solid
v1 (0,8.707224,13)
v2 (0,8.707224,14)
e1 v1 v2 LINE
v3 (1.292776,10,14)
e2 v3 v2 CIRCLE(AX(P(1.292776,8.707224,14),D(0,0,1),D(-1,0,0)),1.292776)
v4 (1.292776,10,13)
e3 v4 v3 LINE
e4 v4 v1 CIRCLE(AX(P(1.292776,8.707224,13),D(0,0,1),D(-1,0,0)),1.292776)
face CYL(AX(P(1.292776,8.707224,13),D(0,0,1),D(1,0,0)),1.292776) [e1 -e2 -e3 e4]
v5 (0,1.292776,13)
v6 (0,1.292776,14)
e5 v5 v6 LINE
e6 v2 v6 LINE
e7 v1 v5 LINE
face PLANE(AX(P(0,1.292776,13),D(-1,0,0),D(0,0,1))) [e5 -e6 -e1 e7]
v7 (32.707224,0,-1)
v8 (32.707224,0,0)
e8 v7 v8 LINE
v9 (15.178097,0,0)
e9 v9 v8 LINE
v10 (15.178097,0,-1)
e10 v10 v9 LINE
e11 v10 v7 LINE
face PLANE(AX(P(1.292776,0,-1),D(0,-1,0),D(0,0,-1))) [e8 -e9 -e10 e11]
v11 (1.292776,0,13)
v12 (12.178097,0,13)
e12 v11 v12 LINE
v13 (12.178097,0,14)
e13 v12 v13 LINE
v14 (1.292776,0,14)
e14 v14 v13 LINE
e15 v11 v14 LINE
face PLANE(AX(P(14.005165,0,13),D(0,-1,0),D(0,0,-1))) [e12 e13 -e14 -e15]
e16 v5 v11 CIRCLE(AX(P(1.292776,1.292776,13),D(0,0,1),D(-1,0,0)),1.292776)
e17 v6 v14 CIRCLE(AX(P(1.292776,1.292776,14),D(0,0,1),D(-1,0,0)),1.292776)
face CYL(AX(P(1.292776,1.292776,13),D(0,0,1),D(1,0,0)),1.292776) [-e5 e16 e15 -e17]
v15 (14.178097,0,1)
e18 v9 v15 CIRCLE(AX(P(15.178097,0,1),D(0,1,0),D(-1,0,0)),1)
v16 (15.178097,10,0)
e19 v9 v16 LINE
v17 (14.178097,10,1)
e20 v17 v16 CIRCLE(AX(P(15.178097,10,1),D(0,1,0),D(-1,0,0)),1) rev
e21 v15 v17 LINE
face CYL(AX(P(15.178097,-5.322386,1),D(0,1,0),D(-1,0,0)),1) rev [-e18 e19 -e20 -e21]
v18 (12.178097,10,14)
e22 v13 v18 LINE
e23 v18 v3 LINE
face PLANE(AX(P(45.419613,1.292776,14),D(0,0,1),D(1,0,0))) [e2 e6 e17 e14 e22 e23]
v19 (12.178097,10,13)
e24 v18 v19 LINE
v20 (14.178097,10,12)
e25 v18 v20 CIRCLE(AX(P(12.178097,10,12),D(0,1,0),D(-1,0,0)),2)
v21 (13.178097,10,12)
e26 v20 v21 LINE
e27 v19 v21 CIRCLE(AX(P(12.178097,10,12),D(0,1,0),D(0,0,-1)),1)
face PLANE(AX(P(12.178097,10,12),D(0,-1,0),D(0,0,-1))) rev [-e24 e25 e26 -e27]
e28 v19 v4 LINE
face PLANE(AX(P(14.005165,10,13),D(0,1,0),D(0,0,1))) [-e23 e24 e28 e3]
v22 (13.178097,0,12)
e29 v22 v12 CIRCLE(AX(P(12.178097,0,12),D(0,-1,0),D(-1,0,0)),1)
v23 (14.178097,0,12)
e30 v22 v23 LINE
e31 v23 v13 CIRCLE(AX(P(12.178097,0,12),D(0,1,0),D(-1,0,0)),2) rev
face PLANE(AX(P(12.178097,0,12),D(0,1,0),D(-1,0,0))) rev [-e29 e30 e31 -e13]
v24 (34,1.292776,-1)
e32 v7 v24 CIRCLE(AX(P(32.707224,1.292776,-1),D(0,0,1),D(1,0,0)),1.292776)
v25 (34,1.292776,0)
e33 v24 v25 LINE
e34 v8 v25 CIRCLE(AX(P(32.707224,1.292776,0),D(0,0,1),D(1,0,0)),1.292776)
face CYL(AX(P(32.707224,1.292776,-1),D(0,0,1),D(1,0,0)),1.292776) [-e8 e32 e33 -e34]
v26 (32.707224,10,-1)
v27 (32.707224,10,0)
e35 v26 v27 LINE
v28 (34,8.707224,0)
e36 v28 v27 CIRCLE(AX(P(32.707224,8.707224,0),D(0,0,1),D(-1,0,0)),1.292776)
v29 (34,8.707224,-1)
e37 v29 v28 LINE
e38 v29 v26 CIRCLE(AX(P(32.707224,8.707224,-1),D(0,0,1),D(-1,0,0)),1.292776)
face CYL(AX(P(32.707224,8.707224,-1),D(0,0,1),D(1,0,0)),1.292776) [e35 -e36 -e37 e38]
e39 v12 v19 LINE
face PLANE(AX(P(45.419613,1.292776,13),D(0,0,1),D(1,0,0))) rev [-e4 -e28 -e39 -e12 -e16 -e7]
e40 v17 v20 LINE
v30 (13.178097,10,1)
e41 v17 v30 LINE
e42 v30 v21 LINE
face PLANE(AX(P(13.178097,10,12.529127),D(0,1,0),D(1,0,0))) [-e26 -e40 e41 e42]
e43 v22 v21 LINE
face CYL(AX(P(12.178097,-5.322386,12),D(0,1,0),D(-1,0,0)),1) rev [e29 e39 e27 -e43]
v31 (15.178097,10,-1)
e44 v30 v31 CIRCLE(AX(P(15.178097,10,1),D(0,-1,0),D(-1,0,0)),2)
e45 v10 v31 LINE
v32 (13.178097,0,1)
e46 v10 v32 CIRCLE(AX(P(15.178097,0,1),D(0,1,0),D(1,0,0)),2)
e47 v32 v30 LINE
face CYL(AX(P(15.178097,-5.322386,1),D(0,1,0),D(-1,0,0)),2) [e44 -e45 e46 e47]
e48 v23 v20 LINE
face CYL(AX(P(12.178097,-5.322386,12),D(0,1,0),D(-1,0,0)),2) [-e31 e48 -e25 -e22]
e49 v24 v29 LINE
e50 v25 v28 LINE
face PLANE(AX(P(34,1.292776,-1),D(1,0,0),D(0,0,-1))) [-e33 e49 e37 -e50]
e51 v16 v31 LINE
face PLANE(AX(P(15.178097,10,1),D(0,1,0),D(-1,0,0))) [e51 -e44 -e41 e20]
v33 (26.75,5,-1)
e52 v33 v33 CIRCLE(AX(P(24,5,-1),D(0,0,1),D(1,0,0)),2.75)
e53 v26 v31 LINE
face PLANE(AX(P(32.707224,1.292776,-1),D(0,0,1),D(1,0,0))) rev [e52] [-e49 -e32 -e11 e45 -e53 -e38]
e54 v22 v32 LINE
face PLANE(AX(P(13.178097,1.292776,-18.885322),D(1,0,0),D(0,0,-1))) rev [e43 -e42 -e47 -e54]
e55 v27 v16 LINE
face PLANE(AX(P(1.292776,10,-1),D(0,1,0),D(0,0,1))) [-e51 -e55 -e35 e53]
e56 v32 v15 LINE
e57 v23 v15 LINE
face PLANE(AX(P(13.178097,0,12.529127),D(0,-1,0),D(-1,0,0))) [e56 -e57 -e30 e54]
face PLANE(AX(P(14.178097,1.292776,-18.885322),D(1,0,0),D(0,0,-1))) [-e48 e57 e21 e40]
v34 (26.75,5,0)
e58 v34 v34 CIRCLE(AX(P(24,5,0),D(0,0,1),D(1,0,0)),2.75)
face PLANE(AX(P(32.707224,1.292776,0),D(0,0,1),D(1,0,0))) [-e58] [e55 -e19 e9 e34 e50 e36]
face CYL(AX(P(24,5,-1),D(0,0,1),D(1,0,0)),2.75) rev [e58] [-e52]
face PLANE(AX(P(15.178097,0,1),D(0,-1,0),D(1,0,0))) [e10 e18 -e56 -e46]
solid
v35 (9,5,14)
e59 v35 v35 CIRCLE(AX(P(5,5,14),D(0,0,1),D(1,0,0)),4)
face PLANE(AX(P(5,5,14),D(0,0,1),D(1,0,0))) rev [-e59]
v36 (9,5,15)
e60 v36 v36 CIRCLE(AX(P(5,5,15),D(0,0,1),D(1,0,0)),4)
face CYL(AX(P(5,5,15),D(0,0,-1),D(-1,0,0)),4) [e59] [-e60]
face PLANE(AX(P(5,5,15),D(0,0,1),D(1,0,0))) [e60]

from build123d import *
from build123d.topology import SkipClean

# Parameters (mm, degrees)
SKETCH1_R           = 2.75
BASE_FLANGE1_DEPTH  = 1
JOG1_DEPTH          = 10
JOG1_START          = 1.292775665
JOG1_2_DEPTH        = 7.41444867
JOG1_START_2        = 12
JOG1_3_DEPTH        = 1.974011807
JOG1_4_OUTLINE_W    = 1
JOG1_4_OUTLINE_H    = 1.292775665
JOG1_4_DEPTH        = 12.152182036
JOG1_START_3        = 13
JOG1_5_DEPTH        = 1
JOG1_6_DEPTH        = 10
JOG1_7_DEPTH        = 10
SKETCH7_R           = 4
BOSS_EXTRUDE1_DEPTH = 1


with BuildPart() as part:
    # Base-Flange1: sheet metal written as solids
    # Sketch1 → Base-Flange1 (new body)
    with BuildSketch(Plane.XY):
        with BuildLine():
            Line((1.292775665, 0), (32.707224335, 0))
            ThreePointArc((32.707224335, 0), (33.621354774, 0.378645226), (34, 1.292775665))
            Line((34, 1.292775665), (34, 8.707224335))
            ThreePointArc((34, 8.707224335), (33.621354774, 9.621354774), (32.707224335, 10))
            Line((32.707224335, 10), (1.292775665, 10))
            ThreePointArc((1.292775665, 10), (0.378645226, 9.621354774), (0, 8.707224335))
            Line((0, 8.707224335), (0, 1.292775665))
            ThreePointArc((0, 1.292775665), (0.378645226, 0.378645226), (1.292775665, 0))
        make_face()
        with Locations((24, 5)):
            Circle(SKETCH1_R, mode=Mode.SUBTRACT)
    extrude(amount=-BASE_FLANGE1_DEPTH)

    # Jog1: read off the stored shape, not the designer's step
    # Jog1 outline → Jog1 (cut)
    with BuildSketch(Plane(origin=(0, 0, 0), x_dir=(1, 0, 0), z_dir=(0, 1, 0))):
        with BuildLine():
            Line((0, 0), (13.446046438, 0))
            ThreePointArc((13.446046438, 0), (14.178097245, 0.732050807), (15.178097245, 1))
            Line((15.178097245, 1), (0, 1))
            Line((0, 1), (0, 0))
        make_face()
    extrude(amount=JOG1_DEPTH, mode=Mode.SUBTRACT)

    # Jog1 2 outline → Jog1 2 (add)
    with BuildSketch(Plane(origin=(0, 0, 0), x_dir=(1, 0, 0), z_dir=(0, 1, 0)).offset(JOG1_START)):
        with BuildLine():
            Line((13.178097245, -1), (13.178097245, -12))
            ThreePointArc((13.178097245, -12), (12.885204026, -12.707106781), (12.178097245, -13))
            Line((12.178097245, -13), (0, -13))
            Line((0, -13), (0, -14))
            Line((0, -14), (12.178097245, -14))
            ThreePointArc((12.178097245, -14), (13.592310807, -13.414213562), (14.178097245, -12))
            Line((14.178097245, -12), (14.178097245, -1))
            ThreePointArc((14.178097245, -1), (14.470990464, -0.292893219), (15.178097245, 0))
            Line((15.178097245, 0), (13.446046438, 0))
            ThreePointArc((13.446046438, 0), (13.246245593, -0.48236191), (13.178097245, -1))
        make_face()
    extrude(amount=JOG1_2_DEPTH)

    # Jog1 3 outline → Jog1 3 (add)
    with BuildSketch(Plane.XY.offset(JOG1_START_2)):
        with BuildLine():
            Line((14.178097245, 0), (14.178097245, 1.292775665))
            Line((14.178097245, 1.292775665), (0, 1.292775665))
            ThreePointArc((0, 1.292775665), (0.378645226, 0.378645226), (1.292775665, 0))
            Line((1.292775665, 0), (14.178097245, 0))
        make_face()
        with BuildLine():
            Line((0, 8.707224335), (14.178097245, 8.707224335))
            Line((14.178097245, 8.707224335), (14.178097245, 10))
            Line((14.178097245, 10), (1.292775665, 10))
            ThreePointArc((1.292775665, 10), (0.378645226, 9.621354774), (0, 8.707224335))
        make_face()
    extrude(amount=JOG1_3_DEPTH)

    # Jog1 4 outline → Jog1 4 (add)
    with BuildSketch(Plane.XY):
        with Locations((13.678097245, 0.646387833)):
            Rectangle(JOG1_4_OUTLINE_W, JOG1_4_OUTLINE_H)
        with Locations((13.678097245, 9.353612167)):
            Rectangle(JOG1_4_OUTLINE_W, JOG1_4_OUTLINE_H)
    extrude(amount=JOG1_4_DEPTH)

    # Jog1 5 outline → Jog1 5 (add)
    with BuildSketch(Plane.XY.offset(JOG1_START_3)):
        with BuildLine():
            Line((1.292775665, 0), (13.178097245, 0))
            Line((13.178097245, 0), (13.178097245, 1.292775665))
            Line((13.178097245, 1.292775665), (0, 1.292775665))
            ThreePointArc((0, 1.292775665), (0.378645226, 0.378645226), (1.292775665, 0))
        make_face()
        with BuildLine():
            Line((0, 8.707224335), (13.178097245, 8.707224335))
            Line((13.178097245, 8.707224335), (13.178097245, 10))
            Line((13.178097245, 10), (1.292775665, 10))
            ThreePointArc((1.292775665, 10), (0.378645226, 9.621354774), (0, 8.707224335))
        make_face()
    extrude(amount=JOG1_5_DEPTH)

    # Jog1 6 outline → Jog1 6 (cut)
    with SkipClean():  # the faces are left unmerged after this step: merging them gives an invalid solid
        with BuildSketch(Plane(origin=(0, 0, 0), x_dir=(1, 0, 0), z_dir=(0, 1, 0))):
            with BuildLine():
                ThreePointArc((13.178097245, -1), (13.246245593, -0.48236191), (13.446046438, 0))
                ThreePointArc((13.446046438, 0), (13.763883685, 0.414213564), (14.178097249, 0.732050809))
                Line((14.178097249, 0.732050809), (14.178097253, 1))
                Line((14.178097253, 1), (-1, 1))
                Line((-1, 1), (-1, -13))
                Line((-1, -13), (12.178097245, -13))
                ThreePointArc((12.178097245, -13), (12.885204026, -12.707106781), (13.178097245, -12))
                Line((13.178097245, -12), (13.178097245, -1))
            make_face()
            with BuildLine():
                Line((13.178097245, -14), (13.178097245, -13.974011807))
                Line((13.178097245, -13.974011807), (14.178097245, -13.974011807))
                Line((14.178097245, -13.974011807), (14.178097245, -12))
                ThreePointArc((14.178097245, -12), (13.592310807, -13.414213562), (12.178097245, -14))
                Line((12.178097245, -14), (-1, -14.000000008))
                Line((-1, -14.000000008), (-1, -15))
                Line((-1, -15), (13.178097236, -15))
                Line((13.178097236, -15), (13.178097245, -14))
            make_face()
        extrude(amount=JOG1_6_DEPTH, mode=Mode.SUBTRACT)
    add(part.part.scale(1), mode=Mode.REPLACE)  # the faces are merged on a copy

    # Jog1 7 outline → Jog1 7 (add)
    with BuildSketch(Plane(origin=(0, 0, 0), x_dir=(1, 0, 0), z_dir=(0, 1, 0))):
        with BuildLine():
            ThreePointArc((15.178097245, 1), (14.660459157, 0.931851653), (14.178097249, 0.732050809))
            Line((14.178097249, 0.732050809), (14.178097252, 0))
            Line((14.178097252, 0), (14.178097245, -1))
            ThreePointArc((14.178097245, -1), (14.470990464, -0.292893219), (15.178097245, 0))
            Line((15.178097245, 0), (17, 1e-09))
            Line((17, 1e-09), (17, 1))
            Line((17, 1), (15.178097245, 1))
        make_face()
    extrude(amount=JOG1_7_DEPTH)


with BuildPart() as body_2:
    # Sketch7 → Boss-Extrude1 (new body)
    with BuildSketch(Plane.XY.offset(14)):
        with Locations((5, 5)):
            Circle(SKETCH7_R)
    extrude(amount=BOSS_EXTRUDE1_DEPTH)


solid = Compound([part.part, body_2.part])
